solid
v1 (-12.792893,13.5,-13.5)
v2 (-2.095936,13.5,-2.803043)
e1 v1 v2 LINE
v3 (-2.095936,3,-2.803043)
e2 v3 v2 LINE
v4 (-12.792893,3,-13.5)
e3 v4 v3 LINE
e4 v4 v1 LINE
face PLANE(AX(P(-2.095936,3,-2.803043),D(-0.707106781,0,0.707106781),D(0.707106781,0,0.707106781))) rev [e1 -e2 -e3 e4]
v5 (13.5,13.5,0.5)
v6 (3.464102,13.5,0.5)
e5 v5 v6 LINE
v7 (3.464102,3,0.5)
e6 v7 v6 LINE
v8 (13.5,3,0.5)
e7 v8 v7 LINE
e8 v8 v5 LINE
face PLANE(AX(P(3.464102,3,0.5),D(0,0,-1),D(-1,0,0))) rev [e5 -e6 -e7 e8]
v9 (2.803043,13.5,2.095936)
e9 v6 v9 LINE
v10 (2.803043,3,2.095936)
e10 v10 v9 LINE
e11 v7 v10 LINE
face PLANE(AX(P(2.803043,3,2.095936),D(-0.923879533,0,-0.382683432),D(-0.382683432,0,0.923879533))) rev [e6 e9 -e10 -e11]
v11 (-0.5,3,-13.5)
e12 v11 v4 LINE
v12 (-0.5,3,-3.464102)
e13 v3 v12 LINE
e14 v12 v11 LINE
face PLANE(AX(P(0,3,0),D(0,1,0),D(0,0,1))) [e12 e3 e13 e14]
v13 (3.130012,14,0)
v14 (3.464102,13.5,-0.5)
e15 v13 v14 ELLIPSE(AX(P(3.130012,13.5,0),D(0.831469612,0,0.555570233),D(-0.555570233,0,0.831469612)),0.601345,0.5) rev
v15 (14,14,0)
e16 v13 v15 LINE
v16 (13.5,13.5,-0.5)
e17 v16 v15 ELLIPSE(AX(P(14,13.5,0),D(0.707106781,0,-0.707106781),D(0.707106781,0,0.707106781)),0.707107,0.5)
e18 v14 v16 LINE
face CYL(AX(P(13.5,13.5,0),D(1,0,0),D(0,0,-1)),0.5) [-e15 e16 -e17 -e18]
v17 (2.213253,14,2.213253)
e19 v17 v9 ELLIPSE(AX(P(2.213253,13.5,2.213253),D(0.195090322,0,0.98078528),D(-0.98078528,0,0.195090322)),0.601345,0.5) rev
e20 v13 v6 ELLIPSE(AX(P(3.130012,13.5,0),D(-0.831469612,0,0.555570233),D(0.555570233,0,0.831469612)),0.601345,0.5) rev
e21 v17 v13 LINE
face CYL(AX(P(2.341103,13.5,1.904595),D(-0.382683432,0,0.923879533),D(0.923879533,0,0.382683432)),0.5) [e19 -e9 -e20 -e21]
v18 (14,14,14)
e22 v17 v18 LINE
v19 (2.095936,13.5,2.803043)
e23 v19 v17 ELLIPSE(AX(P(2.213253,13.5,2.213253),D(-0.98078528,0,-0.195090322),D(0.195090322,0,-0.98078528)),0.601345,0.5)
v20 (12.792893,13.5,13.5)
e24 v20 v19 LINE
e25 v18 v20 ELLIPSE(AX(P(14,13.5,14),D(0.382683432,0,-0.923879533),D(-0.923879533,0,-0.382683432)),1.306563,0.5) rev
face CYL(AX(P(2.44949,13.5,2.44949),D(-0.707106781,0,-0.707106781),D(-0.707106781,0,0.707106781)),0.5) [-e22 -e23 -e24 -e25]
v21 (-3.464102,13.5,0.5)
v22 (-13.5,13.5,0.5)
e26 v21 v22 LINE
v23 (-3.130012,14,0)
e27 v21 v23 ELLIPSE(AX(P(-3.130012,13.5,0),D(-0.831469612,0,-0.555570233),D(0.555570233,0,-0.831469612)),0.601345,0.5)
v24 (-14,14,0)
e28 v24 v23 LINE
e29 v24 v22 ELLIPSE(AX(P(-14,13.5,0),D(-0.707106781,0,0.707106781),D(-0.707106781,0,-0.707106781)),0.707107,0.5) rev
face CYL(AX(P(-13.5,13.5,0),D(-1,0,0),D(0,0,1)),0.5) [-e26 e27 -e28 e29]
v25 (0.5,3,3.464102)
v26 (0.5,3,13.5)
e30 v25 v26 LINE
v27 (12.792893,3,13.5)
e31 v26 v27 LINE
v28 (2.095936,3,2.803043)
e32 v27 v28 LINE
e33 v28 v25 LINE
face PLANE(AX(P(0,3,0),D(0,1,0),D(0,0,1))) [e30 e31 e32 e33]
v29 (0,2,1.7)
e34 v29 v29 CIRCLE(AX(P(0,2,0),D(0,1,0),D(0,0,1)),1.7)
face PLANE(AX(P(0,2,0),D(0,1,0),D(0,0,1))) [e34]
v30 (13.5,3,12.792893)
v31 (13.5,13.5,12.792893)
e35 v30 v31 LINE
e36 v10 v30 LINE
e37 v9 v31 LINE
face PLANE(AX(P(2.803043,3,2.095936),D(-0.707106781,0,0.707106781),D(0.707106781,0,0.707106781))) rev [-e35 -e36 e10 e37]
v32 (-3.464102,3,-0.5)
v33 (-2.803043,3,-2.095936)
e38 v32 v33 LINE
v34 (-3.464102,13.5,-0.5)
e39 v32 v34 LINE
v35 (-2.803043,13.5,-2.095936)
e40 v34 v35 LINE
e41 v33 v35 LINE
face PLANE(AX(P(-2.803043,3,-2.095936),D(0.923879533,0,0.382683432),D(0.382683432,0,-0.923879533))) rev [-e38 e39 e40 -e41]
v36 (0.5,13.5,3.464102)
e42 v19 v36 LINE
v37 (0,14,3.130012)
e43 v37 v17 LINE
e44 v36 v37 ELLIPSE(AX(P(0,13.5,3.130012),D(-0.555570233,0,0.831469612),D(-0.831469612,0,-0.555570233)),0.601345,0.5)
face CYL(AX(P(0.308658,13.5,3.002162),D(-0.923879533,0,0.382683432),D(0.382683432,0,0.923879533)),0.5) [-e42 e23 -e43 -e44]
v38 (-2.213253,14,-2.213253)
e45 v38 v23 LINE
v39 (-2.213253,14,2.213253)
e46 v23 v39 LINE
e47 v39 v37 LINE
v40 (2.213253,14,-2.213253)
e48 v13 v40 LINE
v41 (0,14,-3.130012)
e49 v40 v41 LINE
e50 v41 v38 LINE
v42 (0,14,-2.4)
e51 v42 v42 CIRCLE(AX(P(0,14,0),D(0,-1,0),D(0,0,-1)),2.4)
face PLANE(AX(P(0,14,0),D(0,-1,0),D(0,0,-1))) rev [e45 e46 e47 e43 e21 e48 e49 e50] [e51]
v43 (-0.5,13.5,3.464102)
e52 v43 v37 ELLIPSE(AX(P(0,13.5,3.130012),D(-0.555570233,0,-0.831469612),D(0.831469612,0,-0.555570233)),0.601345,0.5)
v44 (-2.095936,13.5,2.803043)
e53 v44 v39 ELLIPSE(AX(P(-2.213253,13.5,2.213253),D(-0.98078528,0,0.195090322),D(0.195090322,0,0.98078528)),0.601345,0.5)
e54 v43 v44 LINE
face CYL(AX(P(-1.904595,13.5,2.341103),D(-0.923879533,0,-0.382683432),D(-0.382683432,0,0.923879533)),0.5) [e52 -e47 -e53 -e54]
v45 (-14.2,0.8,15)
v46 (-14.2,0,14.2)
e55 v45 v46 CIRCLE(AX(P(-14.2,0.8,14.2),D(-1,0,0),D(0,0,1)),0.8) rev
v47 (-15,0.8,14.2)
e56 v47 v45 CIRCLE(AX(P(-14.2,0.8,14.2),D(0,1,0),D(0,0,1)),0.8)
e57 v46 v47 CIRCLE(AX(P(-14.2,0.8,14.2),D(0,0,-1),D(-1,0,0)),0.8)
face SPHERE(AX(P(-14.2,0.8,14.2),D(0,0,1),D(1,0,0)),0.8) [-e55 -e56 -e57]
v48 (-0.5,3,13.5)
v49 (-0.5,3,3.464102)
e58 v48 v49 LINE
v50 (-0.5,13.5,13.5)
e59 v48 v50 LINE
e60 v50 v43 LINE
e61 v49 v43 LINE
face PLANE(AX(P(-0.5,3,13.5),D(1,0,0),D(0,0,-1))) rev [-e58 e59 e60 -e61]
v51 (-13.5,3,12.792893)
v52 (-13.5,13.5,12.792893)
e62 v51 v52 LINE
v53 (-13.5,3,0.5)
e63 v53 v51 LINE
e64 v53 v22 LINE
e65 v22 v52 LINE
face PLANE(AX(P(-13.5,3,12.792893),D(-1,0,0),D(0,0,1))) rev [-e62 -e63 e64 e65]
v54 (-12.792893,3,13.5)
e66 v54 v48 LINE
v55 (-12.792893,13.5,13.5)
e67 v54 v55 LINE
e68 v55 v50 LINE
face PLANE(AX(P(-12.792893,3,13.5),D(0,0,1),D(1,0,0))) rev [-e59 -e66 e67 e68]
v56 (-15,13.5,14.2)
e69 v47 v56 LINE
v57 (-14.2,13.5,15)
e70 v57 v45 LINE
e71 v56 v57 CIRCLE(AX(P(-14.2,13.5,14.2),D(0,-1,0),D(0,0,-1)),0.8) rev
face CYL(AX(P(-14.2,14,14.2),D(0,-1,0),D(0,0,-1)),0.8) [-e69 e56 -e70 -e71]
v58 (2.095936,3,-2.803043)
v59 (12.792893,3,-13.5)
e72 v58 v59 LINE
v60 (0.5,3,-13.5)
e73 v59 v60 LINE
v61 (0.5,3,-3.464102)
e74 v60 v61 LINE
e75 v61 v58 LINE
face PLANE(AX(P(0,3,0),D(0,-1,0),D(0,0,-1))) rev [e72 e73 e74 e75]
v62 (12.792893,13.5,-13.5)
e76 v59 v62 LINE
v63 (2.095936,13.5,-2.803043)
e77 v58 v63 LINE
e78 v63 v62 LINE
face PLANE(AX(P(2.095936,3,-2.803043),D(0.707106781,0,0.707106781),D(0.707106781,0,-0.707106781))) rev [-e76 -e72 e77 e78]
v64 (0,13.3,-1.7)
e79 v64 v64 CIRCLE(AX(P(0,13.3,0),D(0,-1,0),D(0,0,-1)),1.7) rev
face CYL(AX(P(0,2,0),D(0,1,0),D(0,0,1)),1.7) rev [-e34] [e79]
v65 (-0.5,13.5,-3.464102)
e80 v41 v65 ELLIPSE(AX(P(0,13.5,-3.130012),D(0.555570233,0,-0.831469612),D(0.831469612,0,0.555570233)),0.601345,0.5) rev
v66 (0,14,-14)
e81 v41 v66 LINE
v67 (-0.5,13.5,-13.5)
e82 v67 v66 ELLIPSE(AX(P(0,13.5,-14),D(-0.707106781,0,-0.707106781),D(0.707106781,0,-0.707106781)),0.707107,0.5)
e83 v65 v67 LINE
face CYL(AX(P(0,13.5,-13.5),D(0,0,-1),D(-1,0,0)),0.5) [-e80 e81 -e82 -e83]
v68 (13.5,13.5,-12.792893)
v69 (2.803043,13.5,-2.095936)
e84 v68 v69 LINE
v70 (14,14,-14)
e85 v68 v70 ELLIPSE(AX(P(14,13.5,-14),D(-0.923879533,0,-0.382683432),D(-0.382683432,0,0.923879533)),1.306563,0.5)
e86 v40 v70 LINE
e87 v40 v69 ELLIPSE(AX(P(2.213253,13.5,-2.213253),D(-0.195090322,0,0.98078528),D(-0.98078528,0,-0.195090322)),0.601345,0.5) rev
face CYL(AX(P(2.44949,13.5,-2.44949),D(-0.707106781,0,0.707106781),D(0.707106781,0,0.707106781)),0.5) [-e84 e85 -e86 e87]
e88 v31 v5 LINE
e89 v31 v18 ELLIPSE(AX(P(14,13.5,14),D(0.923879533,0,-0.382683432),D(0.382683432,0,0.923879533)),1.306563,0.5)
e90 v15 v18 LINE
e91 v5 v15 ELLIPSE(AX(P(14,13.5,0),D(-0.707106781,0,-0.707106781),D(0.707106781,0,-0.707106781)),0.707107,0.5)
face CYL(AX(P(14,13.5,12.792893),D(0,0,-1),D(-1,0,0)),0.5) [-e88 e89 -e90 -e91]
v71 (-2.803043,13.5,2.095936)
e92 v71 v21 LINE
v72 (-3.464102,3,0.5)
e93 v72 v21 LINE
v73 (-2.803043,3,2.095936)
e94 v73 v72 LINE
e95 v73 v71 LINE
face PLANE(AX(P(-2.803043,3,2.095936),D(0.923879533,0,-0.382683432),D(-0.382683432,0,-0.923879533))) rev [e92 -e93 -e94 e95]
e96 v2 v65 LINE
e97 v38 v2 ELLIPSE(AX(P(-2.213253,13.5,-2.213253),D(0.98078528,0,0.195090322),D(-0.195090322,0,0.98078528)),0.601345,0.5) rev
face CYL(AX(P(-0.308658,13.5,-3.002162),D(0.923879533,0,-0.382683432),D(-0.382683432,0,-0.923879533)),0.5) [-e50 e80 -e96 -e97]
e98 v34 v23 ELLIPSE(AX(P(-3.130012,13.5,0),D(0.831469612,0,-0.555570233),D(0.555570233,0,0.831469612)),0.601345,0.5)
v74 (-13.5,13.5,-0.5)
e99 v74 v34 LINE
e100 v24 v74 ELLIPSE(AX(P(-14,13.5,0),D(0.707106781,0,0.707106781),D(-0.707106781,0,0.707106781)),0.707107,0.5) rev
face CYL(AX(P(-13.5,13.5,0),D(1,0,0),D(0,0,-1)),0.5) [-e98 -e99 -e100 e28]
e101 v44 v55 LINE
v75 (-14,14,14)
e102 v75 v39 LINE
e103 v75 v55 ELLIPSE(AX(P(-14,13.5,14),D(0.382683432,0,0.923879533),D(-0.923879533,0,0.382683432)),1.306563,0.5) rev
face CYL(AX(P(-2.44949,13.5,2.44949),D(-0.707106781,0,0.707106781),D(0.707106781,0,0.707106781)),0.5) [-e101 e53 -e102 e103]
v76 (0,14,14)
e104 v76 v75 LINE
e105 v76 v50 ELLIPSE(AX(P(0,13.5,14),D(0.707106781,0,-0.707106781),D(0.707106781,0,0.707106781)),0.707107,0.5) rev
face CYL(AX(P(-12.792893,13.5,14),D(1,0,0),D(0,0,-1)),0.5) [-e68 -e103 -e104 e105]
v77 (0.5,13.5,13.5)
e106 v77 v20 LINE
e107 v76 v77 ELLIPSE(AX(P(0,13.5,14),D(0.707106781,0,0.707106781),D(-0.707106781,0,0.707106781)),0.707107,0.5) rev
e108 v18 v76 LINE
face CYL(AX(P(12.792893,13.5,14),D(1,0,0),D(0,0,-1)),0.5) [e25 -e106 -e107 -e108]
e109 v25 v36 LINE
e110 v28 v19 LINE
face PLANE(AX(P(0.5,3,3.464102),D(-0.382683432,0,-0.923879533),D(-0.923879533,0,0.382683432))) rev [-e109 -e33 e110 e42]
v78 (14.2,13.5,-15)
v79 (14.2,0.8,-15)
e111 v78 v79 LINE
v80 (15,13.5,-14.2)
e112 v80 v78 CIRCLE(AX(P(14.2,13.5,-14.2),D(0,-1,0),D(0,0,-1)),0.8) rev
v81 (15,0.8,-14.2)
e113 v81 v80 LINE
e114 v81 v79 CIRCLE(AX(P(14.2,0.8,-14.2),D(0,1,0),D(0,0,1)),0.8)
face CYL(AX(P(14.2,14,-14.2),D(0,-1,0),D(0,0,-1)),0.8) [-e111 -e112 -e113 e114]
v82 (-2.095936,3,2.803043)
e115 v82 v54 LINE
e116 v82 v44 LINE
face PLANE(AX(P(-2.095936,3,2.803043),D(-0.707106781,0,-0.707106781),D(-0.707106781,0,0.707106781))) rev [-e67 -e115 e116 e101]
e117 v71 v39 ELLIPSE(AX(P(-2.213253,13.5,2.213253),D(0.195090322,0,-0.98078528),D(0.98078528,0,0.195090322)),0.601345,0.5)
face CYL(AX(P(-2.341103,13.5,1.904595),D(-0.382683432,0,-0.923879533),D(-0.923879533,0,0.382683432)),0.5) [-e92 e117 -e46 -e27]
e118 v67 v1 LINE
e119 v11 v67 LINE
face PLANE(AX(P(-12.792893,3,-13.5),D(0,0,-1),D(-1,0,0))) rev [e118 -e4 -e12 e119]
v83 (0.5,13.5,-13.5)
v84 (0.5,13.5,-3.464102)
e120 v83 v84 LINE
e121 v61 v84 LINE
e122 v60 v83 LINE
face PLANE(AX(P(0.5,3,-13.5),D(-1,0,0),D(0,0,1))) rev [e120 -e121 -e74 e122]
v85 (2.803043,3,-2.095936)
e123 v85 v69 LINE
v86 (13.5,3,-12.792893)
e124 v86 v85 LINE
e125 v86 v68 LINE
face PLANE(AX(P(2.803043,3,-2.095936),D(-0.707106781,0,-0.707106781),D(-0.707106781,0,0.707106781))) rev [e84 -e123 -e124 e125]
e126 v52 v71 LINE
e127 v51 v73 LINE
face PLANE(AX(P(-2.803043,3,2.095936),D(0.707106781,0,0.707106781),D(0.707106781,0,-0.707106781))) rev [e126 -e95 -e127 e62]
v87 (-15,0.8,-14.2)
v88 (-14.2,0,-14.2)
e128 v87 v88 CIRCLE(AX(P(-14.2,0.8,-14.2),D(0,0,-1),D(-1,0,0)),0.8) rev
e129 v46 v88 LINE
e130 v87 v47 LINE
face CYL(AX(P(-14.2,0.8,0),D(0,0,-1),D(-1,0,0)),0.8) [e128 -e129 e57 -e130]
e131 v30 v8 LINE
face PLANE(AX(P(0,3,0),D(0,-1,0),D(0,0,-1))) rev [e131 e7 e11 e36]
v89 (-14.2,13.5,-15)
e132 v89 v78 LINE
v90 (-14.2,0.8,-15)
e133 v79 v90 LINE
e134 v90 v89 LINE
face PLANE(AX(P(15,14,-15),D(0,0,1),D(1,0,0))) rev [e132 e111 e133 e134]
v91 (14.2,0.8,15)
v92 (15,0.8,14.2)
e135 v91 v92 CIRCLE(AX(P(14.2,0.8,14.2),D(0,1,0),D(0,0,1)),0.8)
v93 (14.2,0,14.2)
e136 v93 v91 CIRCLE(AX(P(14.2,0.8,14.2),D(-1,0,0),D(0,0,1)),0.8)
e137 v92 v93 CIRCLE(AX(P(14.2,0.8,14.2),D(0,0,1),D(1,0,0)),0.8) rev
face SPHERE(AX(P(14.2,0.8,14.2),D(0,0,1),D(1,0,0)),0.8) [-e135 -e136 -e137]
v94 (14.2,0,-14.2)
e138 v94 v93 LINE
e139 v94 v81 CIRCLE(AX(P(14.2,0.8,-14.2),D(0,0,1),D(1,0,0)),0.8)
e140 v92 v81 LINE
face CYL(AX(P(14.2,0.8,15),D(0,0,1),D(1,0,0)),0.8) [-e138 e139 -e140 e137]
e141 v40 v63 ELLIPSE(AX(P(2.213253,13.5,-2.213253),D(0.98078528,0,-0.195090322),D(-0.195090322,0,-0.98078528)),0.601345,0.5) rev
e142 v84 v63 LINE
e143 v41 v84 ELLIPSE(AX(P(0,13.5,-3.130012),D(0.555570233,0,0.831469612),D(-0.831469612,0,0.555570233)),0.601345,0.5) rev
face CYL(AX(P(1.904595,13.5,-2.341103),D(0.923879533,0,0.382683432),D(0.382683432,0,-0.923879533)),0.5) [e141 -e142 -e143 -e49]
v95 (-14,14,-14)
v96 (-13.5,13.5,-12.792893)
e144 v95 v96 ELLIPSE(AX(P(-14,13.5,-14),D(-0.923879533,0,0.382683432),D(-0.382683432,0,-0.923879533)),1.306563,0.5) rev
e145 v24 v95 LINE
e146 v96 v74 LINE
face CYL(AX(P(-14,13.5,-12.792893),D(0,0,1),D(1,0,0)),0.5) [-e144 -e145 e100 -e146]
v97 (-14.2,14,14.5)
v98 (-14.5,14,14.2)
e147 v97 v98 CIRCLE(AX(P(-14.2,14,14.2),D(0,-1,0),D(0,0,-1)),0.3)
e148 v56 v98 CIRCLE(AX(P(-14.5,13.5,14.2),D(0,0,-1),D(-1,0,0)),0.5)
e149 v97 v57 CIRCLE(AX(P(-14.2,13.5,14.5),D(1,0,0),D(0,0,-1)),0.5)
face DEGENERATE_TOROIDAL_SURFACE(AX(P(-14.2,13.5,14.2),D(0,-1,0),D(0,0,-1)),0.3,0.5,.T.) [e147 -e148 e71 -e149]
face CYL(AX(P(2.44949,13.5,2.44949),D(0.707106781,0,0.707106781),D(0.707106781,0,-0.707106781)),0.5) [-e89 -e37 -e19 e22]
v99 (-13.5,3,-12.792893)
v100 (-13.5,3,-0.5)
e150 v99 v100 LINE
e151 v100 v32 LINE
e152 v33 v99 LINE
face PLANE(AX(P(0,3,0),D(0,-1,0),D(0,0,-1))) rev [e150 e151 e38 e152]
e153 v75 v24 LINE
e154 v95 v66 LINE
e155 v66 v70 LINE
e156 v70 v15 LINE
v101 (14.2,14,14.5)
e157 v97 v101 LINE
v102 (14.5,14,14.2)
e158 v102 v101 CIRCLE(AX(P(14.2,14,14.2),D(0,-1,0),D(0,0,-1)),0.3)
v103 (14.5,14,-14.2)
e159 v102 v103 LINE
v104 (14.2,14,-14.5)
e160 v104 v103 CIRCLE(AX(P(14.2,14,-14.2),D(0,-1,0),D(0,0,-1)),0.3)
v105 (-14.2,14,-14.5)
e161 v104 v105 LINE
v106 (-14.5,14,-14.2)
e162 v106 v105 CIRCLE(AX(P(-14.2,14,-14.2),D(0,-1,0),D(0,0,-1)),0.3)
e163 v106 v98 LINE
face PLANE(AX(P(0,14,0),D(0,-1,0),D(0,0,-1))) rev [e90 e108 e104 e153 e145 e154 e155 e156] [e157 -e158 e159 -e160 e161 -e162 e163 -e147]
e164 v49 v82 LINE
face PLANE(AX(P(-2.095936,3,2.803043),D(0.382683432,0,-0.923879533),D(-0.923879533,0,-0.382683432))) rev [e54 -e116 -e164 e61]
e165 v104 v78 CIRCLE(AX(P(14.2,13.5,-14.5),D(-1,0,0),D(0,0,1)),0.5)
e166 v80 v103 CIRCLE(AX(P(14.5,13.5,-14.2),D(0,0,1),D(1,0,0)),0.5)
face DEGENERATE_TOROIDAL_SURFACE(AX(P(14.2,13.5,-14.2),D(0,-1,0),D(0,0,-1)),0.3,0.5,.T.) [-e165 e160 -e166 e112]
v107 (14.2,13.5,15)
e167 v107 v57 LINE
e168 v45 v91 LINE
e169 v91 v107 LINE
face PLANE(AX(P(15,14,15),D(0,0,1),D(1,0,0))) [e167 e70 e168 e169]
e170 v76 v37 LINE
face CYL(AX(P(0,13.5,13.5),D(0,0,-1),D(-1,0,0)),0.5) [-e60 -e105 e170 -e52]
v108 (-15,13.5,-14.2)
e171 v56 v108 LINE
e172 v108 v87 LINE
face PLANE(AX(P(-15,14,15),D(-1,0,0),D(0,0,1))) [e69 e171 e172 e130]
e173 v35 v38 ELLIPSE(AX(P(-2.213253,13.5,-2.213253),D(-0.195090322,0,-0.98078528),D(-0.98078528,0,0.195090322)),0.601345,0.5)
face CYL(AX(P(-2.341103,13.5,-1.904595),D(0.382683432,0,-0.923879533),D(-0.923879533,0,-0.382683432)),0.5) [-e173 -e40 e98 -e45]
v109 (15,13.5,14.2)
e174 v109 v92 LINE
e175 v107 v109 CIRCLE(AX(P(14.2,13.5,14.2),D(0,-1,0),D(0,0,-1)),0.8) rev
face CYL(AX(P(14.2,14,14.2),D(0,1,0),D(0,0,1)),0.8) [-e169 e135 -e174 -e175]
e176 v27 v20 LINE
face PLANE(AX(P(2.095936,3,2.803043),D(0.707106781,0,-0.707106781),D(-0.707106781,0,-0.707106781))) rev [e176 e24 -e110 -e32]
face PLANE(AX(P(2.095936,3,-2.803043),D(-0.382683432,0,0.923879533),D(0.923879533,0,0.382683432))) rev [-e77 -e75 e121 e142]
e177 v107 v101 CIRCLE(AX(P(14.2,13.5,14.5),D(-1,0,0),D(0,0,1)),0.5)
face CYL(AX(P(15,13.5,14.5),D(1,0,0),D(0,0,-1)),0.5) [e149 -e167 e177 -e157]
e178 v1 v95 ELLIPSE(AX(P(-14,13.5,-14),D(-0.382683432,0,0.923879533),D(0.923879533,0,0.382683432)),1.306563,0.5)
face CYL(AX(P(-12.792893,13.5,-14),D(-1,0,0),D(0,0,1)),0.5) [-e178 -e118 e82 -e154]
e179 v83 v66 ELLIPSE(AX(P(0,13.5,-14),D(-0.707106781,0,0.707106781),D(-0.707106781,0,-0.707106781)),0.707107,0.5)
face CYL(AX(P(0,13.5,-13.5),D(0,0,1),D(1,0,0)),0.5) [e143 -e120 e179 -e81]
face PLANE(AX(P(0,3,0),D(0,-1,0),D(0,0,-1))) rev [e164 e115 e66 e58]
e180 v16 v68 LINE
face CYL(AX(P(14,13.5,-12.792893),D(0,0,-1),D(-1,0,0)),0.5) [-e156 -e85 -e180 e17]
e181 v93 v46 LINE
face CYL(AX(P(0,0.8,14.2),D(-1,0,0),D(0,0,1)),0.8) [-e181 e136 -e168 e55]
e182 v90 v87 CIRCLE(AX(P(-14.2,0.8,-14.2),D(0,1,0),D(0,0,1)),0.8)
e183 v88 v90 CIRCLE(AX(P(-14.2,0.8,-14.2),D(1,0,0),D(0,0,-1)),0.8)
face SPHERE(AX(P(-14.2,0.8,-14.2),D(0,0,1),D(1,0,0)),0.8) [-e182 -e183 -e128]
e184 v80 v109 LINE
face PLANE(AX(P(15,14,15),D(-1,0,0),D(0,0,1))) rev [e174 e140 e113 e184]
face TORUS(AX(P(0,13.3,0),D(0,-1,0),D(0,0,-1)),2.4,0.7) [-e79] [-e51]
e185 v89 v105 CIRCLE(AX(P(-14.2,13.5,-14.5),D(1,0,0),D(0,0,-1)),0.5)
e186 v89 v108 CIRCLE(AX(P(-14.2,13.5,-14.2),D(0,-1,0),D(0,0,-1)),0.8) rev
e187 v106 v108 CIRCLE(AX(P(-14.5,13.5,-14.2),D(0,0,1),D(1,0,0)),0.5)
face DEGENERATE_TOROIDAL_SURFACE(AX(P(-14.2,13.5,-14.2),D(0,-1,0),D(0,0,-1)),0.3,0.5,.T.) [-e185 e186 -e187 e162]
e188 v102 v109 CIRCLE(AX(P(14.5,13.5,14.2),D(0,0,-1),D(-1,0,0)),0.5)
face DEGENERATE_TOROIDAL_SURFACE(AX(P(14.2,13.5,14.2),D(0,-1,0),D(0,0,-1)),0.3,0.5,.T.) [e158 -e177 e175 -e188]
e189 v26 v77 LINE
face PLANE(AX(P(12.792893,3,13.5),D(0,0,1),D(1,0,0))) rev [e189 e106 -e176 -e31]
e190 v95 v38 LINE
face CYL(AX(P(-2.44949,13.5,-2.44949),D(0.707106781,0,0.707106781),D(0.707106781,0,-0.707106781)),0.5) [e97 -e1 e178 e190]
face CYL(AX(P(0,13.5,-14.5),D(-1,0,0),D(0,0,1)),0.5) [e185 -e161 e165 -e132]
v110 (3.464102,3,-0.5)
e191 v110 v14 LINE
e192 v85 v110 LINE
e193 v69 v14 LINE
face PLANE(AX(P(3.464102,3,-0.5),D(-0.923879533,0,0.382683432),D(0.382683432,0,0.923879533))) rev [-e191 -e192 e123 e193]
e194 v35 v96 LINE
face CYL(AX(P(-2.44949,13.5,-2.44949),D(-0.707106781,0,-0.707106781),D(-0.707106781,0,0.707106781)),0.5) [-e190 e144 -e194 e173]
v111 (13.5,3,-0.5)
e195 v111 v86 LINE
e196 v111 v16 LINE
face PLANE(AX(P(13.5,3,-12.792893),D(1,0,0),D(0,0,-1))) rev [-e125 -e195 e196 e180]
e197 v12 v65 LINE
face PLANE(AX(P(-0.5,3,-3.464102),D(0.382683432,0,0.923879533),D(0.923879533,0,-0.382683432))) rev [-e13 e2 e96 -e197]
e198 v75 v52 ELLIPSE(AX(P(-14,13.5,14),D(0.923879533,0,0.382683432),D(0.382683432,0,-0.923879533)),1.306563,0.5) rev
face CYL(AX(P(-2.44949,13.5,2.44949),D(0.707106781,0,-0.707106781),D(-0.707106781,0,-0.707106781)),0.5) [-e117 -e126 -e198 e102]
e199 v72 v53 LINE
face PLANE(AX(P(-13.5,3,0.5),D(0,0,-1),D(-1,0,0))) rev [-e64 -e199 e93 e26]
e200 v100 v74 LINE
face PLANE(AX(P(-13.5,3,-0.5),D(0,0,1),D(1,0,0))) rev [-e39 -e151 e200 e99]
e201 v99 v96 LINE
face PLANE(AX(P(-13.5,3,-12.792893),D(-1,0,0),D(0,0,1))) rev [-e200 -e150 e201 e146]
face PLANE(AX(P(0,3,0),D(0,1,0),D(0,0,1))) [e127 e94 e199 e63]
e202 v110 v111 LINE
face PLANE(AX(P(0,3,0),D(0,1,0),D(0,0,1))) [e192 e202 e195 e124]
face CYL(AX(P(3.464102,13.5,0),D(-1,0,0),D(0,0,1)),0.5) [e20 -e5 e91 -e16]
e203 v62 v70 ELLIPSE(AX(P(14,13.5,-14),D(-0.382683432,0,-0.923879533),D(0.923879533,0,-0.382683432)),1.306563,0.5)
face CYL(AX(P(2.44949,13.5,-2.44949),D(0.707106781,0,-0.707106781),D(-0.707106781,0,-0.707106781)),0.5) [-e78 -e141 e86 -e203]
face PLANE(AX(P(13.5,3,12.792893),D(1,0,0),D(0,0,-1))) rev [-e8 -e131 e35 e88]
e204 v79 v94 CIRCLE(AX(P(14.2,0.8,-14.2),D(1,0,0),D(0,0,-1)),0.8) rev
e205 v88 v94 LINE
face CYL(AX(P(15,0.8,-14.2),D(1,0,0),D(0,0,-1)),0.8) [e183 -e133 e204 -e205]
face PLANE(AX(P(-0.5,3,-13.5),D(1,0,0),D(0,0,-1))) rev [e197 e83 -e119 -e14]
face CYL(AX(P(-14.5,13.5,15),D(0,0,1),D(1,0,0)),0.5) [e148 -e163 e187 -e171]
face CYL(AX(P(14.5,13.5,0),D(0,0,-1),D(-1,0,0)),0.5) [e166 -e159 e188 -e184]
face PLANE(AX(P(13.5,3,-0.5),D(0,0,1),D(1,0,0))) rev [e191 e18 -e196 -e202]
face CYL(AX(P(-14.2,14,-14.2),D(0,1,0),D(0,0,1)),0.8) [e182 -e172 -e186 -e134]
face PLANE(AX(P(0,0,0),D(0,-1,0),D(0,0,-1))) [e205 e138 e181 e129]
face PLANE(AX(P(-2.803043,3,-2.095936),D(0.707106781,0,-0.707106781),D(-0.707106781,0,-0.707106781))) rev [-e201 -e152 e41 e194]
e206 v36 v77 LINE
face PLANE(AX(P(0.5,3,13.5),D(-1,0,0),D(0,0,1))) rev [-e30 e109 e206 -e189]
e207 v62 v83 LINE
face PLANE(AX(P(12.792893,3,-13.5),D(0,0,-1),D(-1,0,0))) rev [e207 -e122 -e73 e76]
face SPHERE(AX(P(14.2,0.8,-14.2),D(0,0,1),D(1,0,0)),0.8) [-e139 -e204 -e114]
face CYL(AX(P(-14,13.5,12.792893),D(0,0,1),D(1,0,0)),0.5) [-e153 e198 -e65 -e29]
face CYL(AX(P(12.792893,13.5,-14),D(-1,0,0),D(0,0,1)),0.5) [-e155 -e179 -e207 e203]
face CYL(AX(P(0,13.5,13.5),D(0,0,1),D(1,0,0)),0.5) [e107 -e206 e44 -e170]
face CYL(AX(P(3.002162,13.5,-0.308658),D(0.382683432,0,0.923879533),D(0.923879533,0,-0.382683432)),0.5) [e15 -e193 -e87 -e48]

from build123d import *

# Parameters (mm, degrees)
SKETCH1_W           = 30
SKETCH1_H           = 30
BOSS_EXTRUDE1_DEPTH = 14
SKETCH2_R           = 1.7
CUT_EXTRUDE1_DEPTH  = 12
CUT_EXTRUDE2_DEPTH  = 11
FILLET1_R           = 0.7
FILLET2_R           = 0.5
FILLET3_R           = 0.8
FILLET4_R           = 0.8


# Some blends are built 0.0001 mm under size
with BuildPart() as part:
    # Sketch1 → Boss-Extrude1 (new body)
    with BuildSketch(Plane(origin=(0, 0, 0), x_dir=(1, 0, 0), z_dir=(0, 1, 0))):
        Rectangle(SKETCH1_W, SKETCH1_H)
    extrude(amount=BOSS_EXTRUDE1_DEPTH)

    # Sketch2 → Cut-Extrude1 (cut)
    with BuildSketch(Plane(origin=(0, 14, 0), x_dir=(1, 0, 0), z_dir=(0, 1, 0))):
        with Locations(Location((0, 0, 0), (0, 0, 270))):
            Circle(SKETCH2_R)
    extrude(amount=-CUT_EXTRUDE1_DEPTH, mode=Mode.SUBTRACT)

    # Sketch3 → Cut-Extrude2 (cut)
    with BuildSketch(Plane(origin=(0, 14, 0), x_dir=(1, 0, 0), z_dir=(0, 1, 0))):
        Polygon((2.095936352, 2.803043133), (12.792893219, 13.5), (0.5, 13.5), (0.5, 3.464101615), align=None)
        Polygon((2.803043133, 2.095936352), (13.5, 12.792893219), (13.5, 0.5), (3.464101615, 0.5), align=None)
        Polygon((3.464101615, -0.5), (13.5, -0.5), (13.5, -12.792893219), (2.803043133, -2.095936352), align=None)
        Polygon((2.095936352, -2.803043133), (12.792893219, -13.5), (0.5, -13.5), (0.5, -3.464101615), align=None)
        Polygon((-2.095936352, -2.803043133), (-12.792893219, -13.5), (-0.5, -13.5), (-0.5, -3.464101615), align=None)
        Polygon((-2.803043133, -2.095936352), (-13.5, -12.792893219), (-13.5, -0.5), (-3.464101615, -0.5), align=None)
        Polygon((-2.803043133, 2.095936352), (-13.5, 12.792893219), (-13.5, 0.5), (-3.464101615, 0.5), align=None)
        Polygon((-2.095936352, 2.803043133), (-12.792893219, 13.5), (-0.5, 13.5), (-0.5, 3.464101615), align=None)
    extrude(amount=-CUT_EXTRUDE2_DEPTH, mode=Mode.SUBTRACT)

    # Fillet1
    fillet1_edges = [part.edges().sort_by_distance(p)[0] for p in [
        (0, 14, -1.7),
    ]]
    fillet(fillet1_edges, radius=FILLET1_R)

    # Fillet2
    fillet2_edges = [part.edges().sort_by_distance(p)[0] for p in [
        (0, 14, 15),
        (15, 14, 0),
        (8.482050808, 14, -0.5),
        (13.5, 14, -6.646446609),
        (8.151521567, 14, -7.444414786),
        (3.133572374, 14, -1.297968176),
        (-0.5, 14, 8.482050808),
        (-1.297968176, 14, 3.133572374),
        (-7.444414785, 14, 8.151521567),
        (-6.646446609, 14, 13.5),
        (0.5, 14, -8.482050808),
        (1.297968176, 14, -3.133572374),
        (7.444414786, 14, -8.151521567),
        (6.646446609, 14, -13.5),
        (0, 14, -15),
        (0.5, 14, 8.482050808),
        (6.646446609, 14, 13.5),
        (7.444414786, 14, 8.151521567),
        (1.297968176, 14, 3.133572374),
        (-8.482050808, 14, 0.5),
        (-13.5, 14, 6.646446609),
        (-8.151521567, 14, 7.444414786),
        (-3.133572374, 14, 1.297968176),
        (-8.482050808, 14, -0.5),
        (-3.133572374, 14, -1.297968176),
        (-8.151521567, 14, -7.444414786),
        (-13.5, 14, -6.646446609),
        (13.5, 14, 6.646446609),
        (8.482050808, 14, 0.5),
        (3.133572374, 14, 1.297968176),
        (8.151521567, 14, 7.444414786),
        (-0.5, 14, -8.482050808),
        (-6.646446609, 14, -13.5),
        (-7.444414786, 14, -8.151521567),
        (-1.297968176, 14, -3.133572374),
        (-15, 14, 0),
    ]]
    fillet(fillet2_edges, radius=FILLET2_R - 0.0001)  # a hair under: the kernel refuses the full size

    # Fillet3
    fillet3_edges = [part.edges().sort_by_distance(p)[0] for p in [
        (15, 0, 0),
        (0, 0, 15),
        (-15, 0, 0),
        (0, 0, -15),
    ]]
    fillet(fillet3_edges, radius=FILLET3_R)

    # Fillet4
    # the kernel refuses this fillet: 0.8 mm, written as the material it takes off along each edge
    with BuildSketch(Plane(origin=(-14.2, 14, 14.2), x_dir=(-1, 0, 0), z_dir=(0, 0, -1))) as fillet4_piece_1:
        with BuildLine():
            CenterArc((0.3001, -0.4999), 0.4999, 0, 90)
            Line((0.8, -0.4999), (0.8, 0))
            Line((0.8, 0), (0.3001, 0))
        make_face()
    revolve(axis=Axis((-14.2, 14, 14.2), (0, 1, 0)), revolution_arc=90, mode=Mode.SUBTRACT)
    with BuildSketch(Plane(origin=(-14.2, 14, -14.2), x_dir=(0, 0, -1), z_dir=(1, 0, 0))) as fillet4_piece_2:
        with BuildLine():
            CenterArc((0.3001, -0.4999), 0.4999, 0, 90)
            Line((0.8, -0.4999), (0.8, 0))
            Line((0.8, 0), (0.3001, 0))
        make_face()
    revolve(axis=Axis((-14.2, 14, -14.2), (0, 1, 0)), revolution_arc=90, mode=Mode.SUBTRACT)
    with BuildSketch(Plane(origin=(14.2, 14, 14.2), x_dir=(0, 0, 1), z_dir=(-1, 0, 0))) as fillet4_piece_3:
        with BuildLine():
            CenterArc((0.3001, -0.4999), 0.4999, 0, 90)
            Line((0.8, -0.4999), (0.8, 0))
            Line((0.8, 0), (0.3001, 0))
        make_face()
    revolve(axis=Axis((14.2, 14, 14.2), (0, 1, 0)), revolution_arc=90, mode=Mode.SUBTRACT)
    with BuildSketch(Plane(origin=(14.2, 14, -14.2), x_dir=(1, 0, 0), z_dir=(0, 0, 1))) as fillet4_piece_4:
        with BuildLine():
            CenterArc((0.3001, -0.4999), 0.4999, 0, 90)
            Line((0.8, -0.4999), (0.8, 0))
            Line((0.8, 0), (0.3001, 0))
        make_face()
    revolve(axis=Axis((14.2, 14, -14.2), (0, 1, 0)), revolution_arc=90, mode=Mode.SUBTRACT)
    with BuildSketch(Plane(origin=(14.2, 0.8, 14.2), x_dir=(1, 0, 0), z_dir=(0, 0, 1))) as fillet4_piece_5_section:
        Polygon((0, 0), (FILLET4_R, 0), (FILLET4_R, -FILLET4_R), (0, -FILLET4_R), align=None)
    fillet4_piece_5 = extrude(amount=FILLET4_R, mode=Mode.PRIVATE)
    fillet4_piece_5 = fillet4_piece_5 - Plane(origin=(14.2, 0.8, 14.2), x_dir=(-0.7071067811865475, 0.7071067811865475, 0), z_dir=(0, 0, 1)) * Sphere(FILLET4_R, mode=Mode.PRIVATE)
    add(fillet4_piece_5, mode=Mode.SUBTRACT)
    with BuildSketch(Plane(origin=(14.2, 0.8, -14.2), x_dir=(0, 0, -1), z_dir=(1, 0, 0))) as fillet4_piece_6_section:
        Polygon((0, 0), (FILLET4_R, 0), (FILLET4_R, -FILLET4_R), (0, -FILLET4_R), align=None)
    fillet4_piece_6 = extrude(amount=FILLET4_R, mode=Mode.PRIVATE)
    fillet4_piece_6 = fillet4_piece_6 - Plane(origin=(14.2, 0.8, -14.2), x_dir=(0, 0.7071067811865475, 0.7071067811865475), z_dir=(1, 0, 0)) * Sphere(FILLET4_R, mode=Mode.PRIVATE)
    add(fillet4_piece_6, mode=Mode.SUBTRACT)
    with BuildSketch(Plane(origin=(-14.2, 0.8, 14.2), x_dir=(-1, 0, 0), z_dir=(0, 0, 1))) as fillet4_piece_7_section:
        Polygon((0, 0), (FILLET4_R, 0), (FILLET4_R, FILLET4_R), (0, FILLET4_R), align=None)
    fillet4_piece_7 = extrude(amount=FILLET4_R, mode=Mode.PRIVATE)
    fillet4_piece_7 = fillet4_piece_7 - Plane(origin=(-14.2, 0.8, 14.2), x_dir=(0.7071067811865475, 0.7071067811865475, 0), z_dir=(0, 0, 1)) * Sphere(FILLET4_R, mode=Mode.PRIVATE)
    add(fillet4_piece_7, mode=Mode.SUBTRACT)
    with BuildSketch(Plane(origin=(-14.2, 0.8, -14.2), x_dir=(0, 0, -1), z_dir=(-1, 0, 0))) as fillet4_piece_8_section:
        Polygon((0, 0), (FILLET4_R, 0), (FILLET4_R, FILLET4_R), (0, FILLET4_R), align=None)
    fillet4_piece_8 = extrude(amount=FILLET4_R, mode=Mode.PRIVATE)
    fillet4_piece_8 = fillet4_piece_8 - Plane(origin=(-14.2, 0.8, -14.2), x_dir=(0, 0.7071067811865475, 0.7071067811865475), z_dir=(-1, 0, 0)) * Sphere(FILLET4_R, mode=Mode.PRIVATE)
    add(fillet4_piece_8, mode=Mode.SUBTRACT)
    with BuildSketch(Plane(origin=(15, 0.8, -15), x_dir=(0, 0, 1), z_dir=(0, 1, 0)), Plane(origin=(15, 0.8, 15), x_dir=(-1, 0, 0), z_dir=(0, 1, 0))) as fillet4_piece_9:
        with BuildLine():
            CenterArc((FILLET4_R, -FILLET4_R), FILLET4_R, 90, 90)
            Line((0, -FILLET4_R), (0, 0))
            Line((0, 0), (FILLET4_R, 0))
        make_face()
    extrude(amount=13.2, mode=Mode.SUBTRACT)
    with BuildSketch(Plane(origin=(-15, 0.8, 15), x_dir=(1, 0, 0), z_dir=(0, 1, 0)), Plane(origin=(-15, 0.8, -15), x_dir=(0, 0, 1), z_dir=(0, 1, 0))) as fillet4_piece_10:
        with BuildLine():
            CenterArc((FILLET4_R, FILLET4_R), FILLET4_R, 180, 90)
            Line((0, FILLET4_R), (0, 0))
            Line((0, 0), (FILLET4_R, 0))
        make_face()
    extrude(amount=13.2, mode=Mode.SUBTRACT)


solid = part.part
